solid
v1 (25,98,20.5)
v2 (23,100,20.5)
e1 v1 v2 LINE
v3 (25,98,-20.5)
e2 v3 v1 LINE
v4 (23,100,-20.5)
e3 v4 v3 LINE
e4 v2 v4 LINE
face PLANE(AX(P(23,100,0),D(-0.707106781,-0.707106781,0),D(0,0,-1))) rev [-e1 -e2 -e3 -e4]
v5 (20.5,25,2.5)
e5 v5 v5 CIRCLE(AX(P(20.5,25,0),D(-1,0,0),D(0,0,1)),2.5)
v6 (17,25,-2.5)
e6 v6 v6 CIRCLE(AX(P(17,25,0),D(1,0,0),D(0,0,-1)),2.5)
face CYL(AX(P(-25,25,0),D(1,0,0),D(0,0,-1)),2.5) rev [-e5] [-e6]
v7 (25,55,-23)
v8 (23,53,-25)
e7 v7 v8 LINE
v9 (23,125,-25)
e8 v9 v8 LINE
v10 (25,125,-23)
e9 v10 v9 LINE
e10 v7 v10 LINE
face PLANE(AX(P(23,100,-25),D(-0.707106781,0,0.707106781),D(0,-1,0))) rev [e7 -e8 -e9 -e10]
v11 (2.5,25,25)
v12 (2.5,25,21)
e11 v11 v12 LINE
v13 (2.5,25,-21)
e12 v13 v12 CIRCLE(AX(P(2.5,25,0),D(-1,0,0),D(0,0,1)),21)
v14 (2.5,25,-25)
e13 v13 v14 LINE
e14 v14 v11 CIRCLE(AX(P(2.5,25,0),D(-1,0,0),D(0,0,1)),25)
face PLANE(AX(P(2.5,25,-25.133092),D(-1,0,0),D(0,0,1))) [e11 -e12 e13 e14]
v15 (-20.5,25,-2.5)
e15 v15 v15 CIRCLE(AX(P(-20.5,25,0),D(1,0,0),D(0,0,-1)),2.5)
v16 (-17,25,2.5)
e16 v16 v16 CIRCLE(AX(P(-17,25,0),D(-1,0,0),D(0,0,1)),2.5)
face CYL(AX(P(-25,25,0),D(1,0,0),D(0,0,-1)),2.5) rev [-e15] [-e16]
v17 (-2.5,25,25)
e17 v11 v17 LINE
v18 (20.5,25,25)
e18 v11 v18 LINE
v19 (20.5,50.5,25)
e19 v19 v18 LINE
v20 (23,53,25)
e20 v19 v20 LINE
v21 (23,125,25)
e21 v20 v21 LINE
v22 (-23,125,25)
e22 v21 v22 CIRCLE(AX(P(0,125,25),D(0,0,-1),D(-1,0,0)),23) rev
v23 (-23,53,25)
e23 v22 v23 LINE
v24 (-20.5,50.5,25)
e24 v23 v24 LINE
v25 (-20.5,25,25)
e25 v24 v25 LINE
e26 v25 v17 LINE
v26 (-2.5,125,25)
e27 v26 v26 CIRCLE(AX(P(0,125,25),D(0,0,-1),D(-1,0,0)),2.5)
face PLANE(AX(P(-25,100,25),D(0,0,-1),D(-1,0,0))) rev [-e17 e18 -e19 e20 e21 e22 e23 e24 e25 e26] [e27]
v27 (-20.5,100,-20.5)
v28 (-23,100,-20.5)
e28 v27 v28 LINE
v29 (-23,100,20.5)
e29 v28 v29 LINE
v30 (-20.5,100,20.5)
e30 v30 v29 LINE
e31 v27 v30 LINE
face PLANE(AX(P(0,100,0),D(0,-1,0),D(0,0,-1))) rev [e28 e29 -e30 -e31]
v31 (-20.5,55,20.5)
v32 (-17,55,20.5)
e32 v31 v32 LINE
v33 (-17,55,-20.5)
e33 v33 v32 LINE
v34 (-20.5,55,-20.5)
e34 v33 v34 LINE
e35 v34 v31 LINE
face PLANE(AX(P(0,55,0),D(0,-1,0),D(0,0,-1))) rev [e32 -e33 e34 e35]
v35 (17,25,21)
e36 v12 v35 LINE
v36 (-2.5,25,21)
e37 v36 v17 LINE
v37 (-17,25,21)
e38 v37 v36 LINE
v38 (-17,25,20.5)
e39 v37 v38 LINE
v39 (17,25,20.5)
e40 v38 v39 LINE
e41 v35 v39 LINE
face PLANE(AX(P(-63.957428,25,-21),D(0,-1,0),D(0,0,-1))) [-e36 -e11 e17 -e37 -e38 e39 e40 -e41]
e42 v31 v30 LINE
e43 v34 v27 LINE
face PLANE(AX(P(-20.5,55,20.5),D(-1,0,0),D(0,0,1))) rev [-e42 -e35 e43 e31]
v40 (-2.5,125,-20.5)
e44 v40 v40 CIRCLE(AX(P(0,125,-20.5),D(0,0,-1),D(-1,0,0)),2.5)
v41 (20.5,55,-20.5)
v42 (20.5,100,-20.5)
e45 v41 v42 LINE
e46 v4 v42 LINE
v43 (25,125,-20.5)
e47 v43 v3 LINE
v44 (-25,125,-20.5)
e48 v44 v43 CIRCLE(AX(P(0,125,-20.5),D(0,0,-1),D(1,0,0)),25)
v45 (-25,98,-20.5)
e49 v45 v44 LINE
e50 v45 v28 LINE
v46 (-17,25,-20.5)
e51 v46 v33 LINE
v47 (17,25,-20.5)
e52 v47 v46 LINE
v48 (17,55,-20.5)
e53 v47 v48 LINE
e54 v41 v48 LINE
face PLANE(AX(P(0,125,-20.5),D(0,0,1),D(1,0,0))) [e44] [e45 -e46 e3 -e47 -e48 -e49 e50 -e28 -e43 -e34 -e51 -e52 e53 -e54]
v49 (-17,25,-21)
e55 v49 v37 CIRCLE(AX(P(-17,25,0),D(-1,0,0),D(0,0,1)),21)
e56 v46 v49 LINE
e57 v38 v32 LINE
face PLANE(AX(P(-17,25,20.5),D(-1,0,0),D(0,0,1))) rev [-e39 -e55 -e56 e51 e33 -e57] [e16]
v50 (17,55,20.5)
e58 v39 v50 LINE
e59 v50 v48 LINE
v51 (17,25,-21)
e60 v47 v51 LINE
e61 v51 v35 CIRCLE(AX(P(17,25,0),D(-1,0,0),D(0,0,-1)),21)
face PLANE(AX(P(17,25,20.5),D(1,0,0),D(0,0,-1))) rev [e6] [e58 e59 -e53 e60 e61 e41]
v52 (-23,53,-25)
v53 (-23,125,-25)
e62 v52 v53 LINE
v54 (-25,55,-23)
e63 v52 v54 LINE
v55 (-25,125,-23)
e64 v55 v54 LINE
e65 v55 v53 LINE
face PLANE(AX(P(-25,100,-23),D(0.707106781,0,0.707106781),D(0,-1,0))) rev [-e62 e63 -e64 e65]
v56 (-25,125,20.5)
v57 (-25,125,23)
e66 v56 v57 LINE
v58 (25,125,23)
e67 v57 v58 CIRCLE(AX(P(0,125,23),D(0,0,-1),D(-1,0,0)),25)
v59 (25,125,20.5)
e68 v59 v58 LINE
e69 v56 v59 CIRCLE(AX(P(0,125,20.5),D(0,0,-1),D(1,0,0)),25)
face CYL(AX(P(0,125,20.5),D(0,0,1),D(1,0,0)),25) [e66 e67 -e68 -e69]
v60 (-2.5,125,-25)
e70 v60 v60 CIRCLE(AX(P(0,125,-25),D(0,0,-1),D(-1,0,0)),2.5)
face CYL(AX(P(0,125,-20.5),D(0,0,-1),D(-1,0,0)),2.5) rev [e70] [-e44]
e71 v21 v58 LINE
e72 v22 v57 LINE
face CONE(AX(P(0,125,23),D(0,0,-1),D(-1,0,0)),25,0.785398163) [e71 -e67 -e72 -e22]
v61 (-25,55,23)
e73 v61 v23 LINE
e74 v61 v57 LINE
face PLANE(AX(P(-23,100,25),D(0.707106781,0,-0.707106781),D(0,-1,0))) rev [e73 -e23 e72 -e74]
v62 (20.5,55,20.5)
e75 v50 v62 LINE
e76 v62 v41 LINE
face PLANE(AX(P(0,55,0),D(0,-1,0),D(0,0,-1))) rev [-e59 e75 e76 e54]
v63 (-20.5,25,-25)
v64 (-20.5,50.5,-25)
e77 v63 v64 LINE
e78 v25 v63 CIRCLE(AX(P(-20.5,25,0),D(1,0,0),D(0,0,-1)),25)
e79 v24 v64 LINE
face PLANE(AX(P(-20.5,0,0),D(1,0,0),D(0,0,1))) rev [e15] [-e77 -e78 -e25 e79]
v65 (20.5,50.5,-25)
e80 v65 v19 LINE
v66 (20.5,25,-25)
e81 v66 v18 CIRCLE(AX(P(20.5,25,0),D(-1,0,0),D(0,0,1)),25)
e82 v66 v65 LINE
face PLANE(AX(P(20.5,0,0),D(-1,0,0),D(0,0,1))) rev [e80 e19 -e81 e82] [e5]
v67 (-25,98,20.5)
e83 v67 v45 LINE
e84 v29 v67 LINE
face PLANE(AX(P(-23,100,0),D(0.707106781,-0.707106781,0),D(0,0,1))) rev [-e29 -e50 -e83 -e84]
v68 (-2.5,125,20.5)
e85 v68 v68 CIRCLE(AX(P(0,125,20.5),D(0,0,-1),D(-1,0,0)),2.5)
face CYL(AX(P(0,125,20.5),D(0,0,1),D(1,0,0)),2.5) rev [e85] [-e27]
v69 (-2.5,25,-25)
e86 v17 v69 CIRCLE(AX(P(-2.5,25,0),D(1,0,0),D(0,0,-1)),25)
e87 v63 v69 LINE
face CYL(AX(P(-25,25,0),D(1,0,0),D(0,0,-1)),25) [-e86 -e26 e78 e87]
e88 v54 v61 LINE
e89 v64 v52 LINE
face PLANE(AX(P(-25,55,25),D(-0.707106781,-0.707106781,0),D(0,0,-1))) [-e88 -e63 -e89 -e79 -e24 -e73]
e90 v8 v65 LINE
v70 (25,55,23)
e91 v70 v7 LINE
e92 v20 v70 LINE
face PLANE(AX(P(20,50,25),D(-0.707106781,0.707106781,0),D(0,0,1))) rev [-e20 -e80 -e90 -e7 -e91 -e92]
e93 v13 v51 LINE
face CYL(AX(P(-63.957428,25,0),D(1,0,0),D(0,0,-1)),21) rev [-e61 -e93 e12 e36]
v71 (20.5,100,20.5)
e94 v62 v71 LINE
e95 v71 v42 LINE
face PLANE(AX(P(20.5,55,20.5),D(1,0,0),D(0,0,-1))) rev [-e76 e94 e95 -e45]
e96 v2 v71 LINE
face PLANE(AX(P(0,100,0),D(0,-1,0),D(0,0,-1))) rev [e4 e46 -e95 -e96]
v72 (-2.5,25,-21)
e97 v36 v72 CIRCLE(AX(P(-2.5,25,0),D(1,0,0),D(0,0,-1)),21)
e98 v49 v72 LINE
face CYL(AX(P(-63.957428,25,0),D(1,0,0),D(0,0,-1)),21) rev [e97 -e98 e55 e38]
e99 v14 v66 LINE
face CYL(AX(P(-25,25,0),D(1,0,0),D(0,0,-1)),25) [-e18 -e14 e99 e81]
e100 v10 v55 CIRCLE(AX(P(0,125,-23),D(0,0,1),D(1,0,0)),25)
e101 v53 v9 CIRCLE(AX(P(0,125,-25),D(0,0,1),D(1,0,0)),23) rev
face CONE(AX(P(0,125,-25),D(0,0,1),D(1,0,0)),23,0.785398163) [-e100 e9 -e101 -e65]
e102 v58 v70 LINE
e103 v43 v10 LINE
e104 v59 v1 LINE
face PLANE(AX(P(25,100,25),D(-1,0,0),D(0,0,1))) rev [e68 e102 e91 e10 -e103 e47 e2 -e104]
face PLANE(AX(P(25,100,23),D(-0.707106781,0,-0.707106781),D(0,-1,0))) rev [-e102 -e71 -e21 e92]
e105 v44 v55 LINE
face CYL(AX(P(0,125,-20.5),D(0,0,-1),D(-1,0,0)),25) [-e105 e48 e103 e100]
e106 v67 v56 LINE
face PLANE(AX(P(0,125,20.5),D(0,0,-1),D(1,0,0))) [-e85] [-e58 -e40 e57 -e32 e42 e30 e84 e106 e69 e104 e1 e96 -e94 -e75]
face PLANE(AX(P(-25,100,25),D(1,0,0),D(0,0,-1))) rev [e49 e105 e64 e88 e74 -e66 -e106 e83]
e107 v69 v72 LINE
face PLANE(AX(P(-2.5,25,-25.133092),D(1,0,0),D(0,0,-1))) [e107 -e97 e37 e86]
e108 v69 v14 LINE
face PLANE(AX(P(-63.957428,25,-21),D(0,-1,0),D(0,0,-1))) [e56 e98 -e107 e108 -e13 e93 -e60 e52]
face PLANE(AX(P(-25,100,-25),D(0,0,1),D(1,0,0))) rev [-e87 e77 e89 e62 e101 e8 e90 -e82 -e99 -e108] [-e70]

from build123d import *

# Parameters (mm, degrees)
SKETCH1_W               = 50
SKETCH1_H               = 50
BOSS_EXTRUDE1_DEPTH     = 100
SKETCH4_R               = 2.5
BOSS_EXTRUDE2_DEPTH     = 4.5
CUT_EXTRUDE1_DEPTH      = 161.078105936
CUT_EXTRUDE1_DEPTH_BACK = 161.078105936
SKETCH5_R               = 2.5
SKETCH6_W               = 50
SKETCH6_H               = 50
CUT_EXTRUDE2_DEPTH      = 4.5
CHAMFER1_SIZE           = 2
CHAMFER2_SIZE           = 5
SKETCH7_W               = 41
SKETCH7_H               = 41
CUT_EXTRUDE3_DEPTH      = 45
SKETCH8_W               = 34
SKETCH8_H               = 41
CUT_EXTRUDE4_DEPTH      = 30
CUT_EXTRUDE5_DEPTH      = 34
SKETCH10_W              = 5
SKETCH10_H              = 50.266184812
CUT_EXTRUDE6_DEPTH      = 25


with BuildPart() as part:
    # Sketch1 → Boss-Extrude1 (new body)
    with BuildSketch(Plane(origin=(0, 0, 0), x_dir=(1, 0, 0), z_dir=(0, 1, 0))):
        Rectangle(SKETCH1_W, SKETCH1_H)
    extrude(amount=BOSS_EXTRUDE1_DEPTH)

    # Sketch4 → Boss-Extrude2 (add)
    with BuildSketch(Plane(origin=(0, 0, -25), x_dir=(-1, 0, 0), z_dir=(0, 0, -1))):
        with BuildLine():
            Line((-25, 100), (25, 100))
            Line((25, 100), (25, 125))
            ThreePointArc((25, 125), (0, 150), (-25, 125))
            Line((-25, 125), (-25, 100))
        make_face()
        with Locations((0, 125)):
            Circle(SKETCH4_R, mode=Mode.SUBTRACT)
    boss_extrude2 = extrude(amount=-BOSS_EXTRUDE2_DEPTH)

    # Mirror2: Boss-Extrude2 across plane
    add(boss_extrude2.mirror(Plane.XY))

    # Sketch5 → Cut-Extrude1 (cut, two sides: drawn at the far end of the back side and taken through both)
    with BuildSketch(Plane.ZY.offset(-25).offset(-CUT_EXTRUDE1_DEPTH_BACK)):
        with BuildLine():
            Line((-25, 0), (2.6e-08, 0))
            ThreePointArc((2.6e-08, 0), (-17.67766952, 7.322330461), (-25, 25))
            Line((-25, 25), (-25, 0))
        make_face()
        with BuildLine():
            Line((25, 0), (25, 25))
            ThreePointArc((25, 25), (17.677669539, 7.32233048), (2.6e-08, 0))
            Line((2.6e-08, 0), (25, 0))
        make_face()
        with Locations((0, 25)):
            Circle(SKETCH5_R)
    extrude(amount=CUT_EXTRUDE1_DEPTH + CUT_EXTRUDE1_DEPTH_BACK, mode=Mode.SUBTRACT)

    # Sketch6 → Cut-Extrude2 (cut)
    with BuildSketch(Plane(origin=(25, 0, 0), x_dir=(0, 0, -1), z_dir=(1, 0, 0))):
        with Locations((0, 25)):
            Rectangle(SKETCH6_W, SKETCH6_H)
    cut_extrude2 = extrude(amount=-CUT_EXTRUDE2_DEPTH, mode=Mode.SUBTRACT)

    # Mirror3: Cut-Extrude2 across plane
    add(cut_extrude2.mirror(Plane(origin=(0, 0, 0), x_dir=(0, 0, 1), z_dir=(1, 0, 0))), mode=Mode.SUBTRACT)

    # Chamfer1
    chamfer1_edges = [part.edges().sort_by_distance(p)[0] for p in [
        (-25, 100, 0),
        (0, 150, -25),
        (25, 100, 0),
        (0, 150, 25),
        (25, 87.5, 25),
        (-25, 87.5, 25),
        (-25, 87.5, -25),
        (25, 87.5, -25),
    ]]
    chamfer(chamfer1_edges, length=CHAMFER1_SIZE)

    # Chamfer2
    # the kernel refuses this chamfer: 5 mm, written as the material it takes off along each edge
    with BuildSketch(Plane(origin=(25, 50, 35.85841494), x_dir=(0.027495876610586317, 0.9996219169112968, 0), z_dir=(0, 0, -1))) as chamfer2_piece_1_section:
        Polygon((CHAMFER2_SIZE * 0.999621916911, -CHAMFER2_SIZE * 0.0274958766106), (-CHAMFER2_SIZE * 0.0274958766106, -CHAMFER2_SIZE * 0.999621916911), (0, 0), align=None)
    chamfer2_piece_1 = extrude(amount=71.71682988, mode=Mode.PRIVATE)
    chamfer2_piece_1 = split(chamfer2_piece_1, bisect_by=Plane(origin=(20.5, 51.679503735, 0), z_dir=(1, 0, 0)), keep=Keep.TOP, mode=Mode.PRIVATE)
    add(chamfer2_piece_1, mode=Mode.SUBTRACT)
    with BuildSketch(Plane(origin=(-25, 50, 35.85841494), x_dir=(-0.027495876610586317, 0.9996219169112968, 0), z_dir=(0, 0, -1))) as chamfer2_piece_2_section:
        Polygon((CHAMFER2_SIZE * 0.999621916911, CHAMFER2_SIZE * 0.0274958766106), (-CHAMFER2_SIZE * 0.0274958766106, CHAMFER2_SIZE * 0.999621916911), (0, 0), align=None)
    chamfer2_piece_2 = extrude(amount=71.71682988, mode=Mode.PRIVATE)
    chamfer2_piece_2 = split(chamfer2_piece_2, bisect_by=Plane(origin=(-20.5, 51.679503735, 0), z_dir=(-1, 0, 0)), keep=Keep.TOP, mode=Mode.PRIVATE)
    add(chamfer2_piece_2, mode=Mode.SUBTRACT)

    # Sketch7 → Cut-Extrude3 (cut)
    with BuildSketch(Plane(origin=(0, 100, 0), x_dir=(1, 0, 0), z_dir=(0, 1, 0))):
        Rectangle(SKETCH7_W, SKETCH7_H)
    extrude(amount=-CUT_EXTRUDE3_DEPTH, mode=Mode.SUBTRACT)

    # Sketch8 → Cut-Extrude4 (cut)
    with BuildSketch(Plane(origin=(0, 55, 0), x_dir=(1, 0, 0), z_dir=(0, 1, 0))):
        Rectangle(SKETCH8_W, SKETCH8_H)
    extrude(amount=-CUT_EXTRUDE4_DEPTH, mode=Mode.SUBTRACT)

    # Sketch9 → Cut-Extrude5 (cut)
    with BuildSketch(Plane.ZY.offset(-17)):
        with BuildLine():
            Line((-21, 25), (21, 25))
            ThreePointArc((21, 25), (0, 4), (-21, 25))
        make_face()
    extrude(amount=CUT_EXTRUDE5_DEPTH, mode=Mode.SUBTRACT)

    # Sketch10 → Cut-Extrude6 (cut)
    with BuildSketch(Plane(origin=(0, 0, 0), x_dir=(1, 0, 0), z_dir=(0, 1, 0))):
        Rectangle(SKETCH10_W, SKETCH10_H)
    extrude(amount=CUT_EXTRUDE6_DEPTH, mode=Mode.SUBTRACT)


solid = part.part
